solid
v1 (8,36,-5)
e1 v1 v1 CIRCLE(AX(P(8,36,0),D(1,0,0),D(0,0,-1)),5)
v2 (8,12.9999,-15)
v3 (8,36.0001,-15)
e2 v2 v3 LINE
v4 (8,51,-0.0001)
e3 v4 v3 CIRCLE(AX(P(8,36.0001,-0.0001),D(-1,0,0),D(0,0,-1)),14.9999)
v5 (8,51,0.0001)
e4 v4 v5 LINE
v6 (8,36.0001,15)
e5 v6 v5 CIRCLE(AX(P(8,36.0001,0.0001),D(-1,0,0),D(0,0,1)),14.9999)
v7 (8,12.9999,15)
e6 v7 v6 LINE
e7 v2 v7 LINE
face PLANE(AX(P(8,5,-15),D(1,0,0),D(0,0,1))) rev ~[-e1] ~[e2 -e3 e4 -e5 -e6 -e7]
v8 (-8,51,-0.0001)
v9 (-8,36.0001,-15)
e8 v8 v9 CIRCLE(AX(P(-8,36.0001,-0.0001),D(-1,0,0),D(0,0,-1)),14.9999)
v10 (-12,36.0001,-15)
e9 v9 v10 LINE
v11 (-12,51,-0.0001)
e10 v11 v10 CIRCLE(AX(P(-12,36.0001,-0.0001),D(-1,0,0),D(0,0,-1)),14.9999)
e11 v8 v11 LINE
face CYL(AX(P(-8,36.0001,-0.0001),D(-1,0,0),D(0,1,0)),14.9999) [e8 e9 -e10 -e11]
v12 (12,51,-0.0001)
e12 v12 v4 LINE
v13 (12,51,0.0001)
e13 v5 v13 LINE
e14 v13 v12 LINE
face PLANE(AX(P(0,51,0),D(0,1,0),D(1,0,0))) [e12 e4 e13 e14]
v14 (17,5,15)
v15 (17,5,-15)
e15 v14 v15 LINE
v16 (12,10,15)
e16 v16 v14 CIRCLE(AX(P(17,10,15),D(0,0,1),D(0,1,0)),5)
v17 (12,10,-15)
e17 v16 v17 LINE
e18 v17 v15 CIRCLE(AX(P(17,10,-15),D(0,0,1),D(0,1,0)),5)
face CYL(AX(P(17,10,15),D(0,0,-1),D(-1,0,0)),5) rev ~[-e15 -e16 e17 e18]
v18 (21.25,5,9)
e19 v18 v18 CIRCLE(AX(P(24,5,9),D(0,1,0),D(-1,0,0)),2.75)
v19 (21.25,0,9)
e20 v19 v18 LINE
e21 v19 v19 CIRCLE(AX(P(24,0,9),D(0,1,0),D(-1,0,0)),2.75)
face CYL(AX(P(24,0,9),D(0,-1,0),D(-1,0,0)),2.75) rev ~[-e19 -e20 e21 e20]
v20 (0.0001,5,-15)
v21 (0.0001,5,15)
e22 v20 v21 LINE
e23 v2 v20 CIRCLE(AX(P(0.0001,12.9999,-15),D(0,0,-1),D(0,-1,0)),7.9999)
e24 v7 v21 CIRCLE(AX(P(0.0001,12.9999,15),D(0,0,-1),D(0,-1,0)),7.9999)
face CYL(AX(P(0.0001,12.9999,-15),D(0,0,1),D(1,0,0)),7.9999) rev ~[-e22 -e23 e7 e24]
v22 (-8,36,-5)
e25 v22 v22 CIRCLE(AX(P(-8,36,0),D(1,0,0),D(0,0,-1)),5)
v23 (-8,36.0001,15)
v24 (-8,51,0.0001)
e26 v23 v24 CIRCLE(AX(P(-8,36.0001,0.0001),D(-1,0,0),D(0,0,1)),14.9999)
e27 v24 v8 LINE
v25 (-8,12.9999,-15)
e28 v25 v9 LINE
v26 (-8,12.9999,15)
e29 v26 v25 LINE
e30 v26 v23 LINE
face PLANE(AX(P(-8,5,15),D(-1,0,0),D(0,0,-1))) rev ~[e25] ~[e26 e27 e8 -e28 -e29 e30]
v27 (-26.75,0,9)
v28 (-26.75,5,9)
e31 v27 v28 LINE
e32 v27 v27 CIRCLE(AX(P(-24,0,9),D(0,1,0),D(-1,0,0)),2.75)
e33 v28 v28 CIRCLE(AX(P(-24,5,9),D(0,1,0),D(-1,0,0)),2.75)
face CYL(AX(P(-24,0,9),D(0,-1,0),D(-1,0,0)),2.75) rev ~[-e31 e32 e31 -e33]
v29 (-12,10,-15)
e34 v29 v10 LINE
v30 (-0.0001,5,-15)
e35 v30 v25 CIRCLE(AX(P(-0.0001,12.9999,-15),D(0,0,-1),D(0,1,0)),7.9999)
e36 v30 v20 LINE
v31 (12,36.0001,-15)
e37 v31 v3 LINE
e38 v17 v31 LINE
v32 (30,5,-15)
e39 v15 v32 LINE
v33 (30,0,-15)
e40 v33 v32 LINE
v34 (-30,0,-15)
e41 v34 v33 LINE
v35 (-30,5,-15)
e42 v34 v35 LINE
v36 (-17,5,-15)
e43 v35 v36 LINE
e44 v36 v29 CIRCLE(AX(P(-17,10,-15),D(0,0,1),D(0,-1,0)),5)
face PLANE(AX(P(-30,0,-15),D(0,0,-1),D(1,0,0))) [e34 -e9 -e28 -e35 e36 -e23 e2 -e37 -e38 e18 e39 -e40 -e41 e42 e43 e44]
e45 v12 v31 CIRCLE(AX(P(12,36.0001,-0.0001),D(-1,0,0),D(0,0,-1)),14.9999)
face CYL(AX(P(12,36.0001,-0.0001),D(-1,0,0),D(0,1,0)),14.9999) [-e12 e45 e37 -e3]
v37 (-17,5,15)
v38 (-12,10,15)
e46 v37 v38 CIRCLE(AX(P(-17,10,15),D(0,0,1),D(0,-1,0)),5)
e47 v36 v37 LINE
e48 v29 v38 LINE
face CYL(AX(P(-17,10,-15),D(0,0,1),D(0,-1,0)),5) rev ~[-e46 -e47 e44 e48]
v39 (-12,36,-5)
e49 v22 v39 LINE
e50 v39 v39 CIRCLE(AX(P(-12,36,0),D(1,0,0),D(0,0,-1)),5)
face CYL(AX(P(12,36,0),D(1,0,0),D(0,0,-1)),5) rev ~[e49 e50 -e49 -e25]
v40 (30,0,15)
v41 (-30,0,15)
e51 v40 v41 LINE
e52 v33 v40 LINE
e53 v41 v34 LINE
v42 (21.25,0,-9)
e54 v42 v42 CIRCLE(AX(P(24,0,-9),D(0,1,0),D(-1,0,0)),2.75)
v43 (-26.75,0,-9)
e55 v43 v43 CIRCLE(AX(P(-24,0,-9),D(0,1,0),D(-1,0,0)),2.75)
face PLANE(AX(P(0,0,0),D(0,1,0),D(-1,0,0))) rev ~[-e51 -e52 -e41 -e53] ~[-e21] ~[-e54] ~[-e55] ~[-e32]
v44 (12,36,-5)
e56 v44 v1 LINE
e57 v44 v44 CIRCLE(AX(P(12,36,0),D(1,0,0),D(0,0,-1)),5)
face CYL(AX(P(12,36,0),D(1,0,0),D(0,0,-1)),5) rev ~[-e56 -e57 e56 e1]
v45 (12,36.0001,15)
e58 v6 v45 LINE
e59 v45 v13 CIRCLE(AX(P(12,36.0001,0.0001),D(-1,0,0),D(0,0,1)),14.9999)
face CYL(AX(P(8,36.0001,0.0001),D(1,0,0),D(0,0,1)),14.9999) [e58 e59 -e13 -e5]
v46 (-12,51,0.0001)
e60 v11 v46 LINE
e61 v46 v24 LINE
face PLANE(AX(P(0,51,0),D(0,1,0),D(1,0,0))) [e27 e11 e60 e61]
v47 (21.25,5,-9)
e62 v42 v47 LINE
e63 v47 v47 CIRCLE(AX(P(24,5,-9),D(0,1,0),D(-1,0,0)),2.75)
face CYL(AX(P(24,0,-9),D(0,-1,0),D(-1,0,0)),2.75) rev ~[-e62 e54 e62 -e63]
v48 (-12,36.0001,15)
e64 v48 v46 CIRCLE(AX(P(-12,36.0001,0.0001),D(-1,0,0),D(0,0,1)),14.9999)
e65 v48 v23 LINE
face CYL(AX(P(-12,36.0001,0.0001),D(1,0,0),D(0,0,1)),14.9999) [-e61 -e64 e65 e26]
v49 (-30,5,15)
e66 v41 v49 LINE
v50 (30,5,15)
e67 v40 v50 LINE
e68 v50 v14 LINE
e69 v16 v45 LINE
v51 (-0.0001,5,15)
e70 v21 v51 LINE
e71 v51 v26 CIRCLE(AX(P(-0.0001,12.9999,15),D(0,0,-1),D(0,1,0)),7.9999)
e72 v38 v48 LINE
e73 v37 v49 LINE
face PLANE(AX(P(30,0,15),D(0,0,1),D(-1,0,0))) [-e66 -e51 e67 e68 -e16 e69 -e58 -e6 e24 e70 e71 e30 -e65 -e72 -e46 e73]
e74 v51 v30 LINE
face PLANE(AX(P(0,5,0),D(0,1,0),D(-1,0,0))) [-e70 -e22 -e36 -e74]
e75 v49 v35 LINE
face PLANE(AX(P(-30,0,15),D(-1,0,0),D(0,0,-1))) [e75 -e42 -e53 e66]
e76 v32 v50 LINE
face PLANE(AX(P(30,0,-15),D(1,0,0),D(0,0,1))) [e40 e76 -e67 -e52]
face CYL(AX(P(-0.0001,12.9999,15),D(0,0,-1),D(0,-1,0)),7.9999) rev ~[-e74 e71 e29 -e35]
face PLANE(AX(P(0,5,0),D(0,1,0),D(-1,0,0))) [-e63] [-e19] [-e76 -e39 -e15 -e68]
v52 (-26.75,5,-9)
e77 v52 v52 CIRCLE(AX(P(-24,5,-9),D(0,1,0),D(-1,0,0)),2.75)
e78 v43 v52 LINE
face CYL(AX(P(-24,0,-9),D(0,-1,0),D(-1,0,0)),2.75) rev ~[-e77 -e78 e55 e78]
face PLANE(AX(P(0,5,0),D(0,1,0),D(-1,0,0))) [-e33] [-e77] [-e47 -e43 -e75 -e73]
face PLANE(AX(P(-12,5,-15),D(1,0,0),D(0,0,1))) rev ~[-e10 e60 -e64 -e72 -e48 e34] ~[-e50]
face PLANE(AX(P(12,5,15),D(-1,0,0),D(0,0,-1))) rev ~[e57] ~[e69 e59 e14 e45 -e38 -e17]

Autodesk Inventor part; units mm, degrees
ref_plane "YZ Plane" through (0, 0, 0) normal (1, 0, 0) x (0, 1, 0)
ref_plane "XZ Plane" through (0, 0, 0) normal (0, 1, 0) x (-1, 0, 0)
ref_plane "XY Plane" through (0, 0, 0) normal (0, 0, 1) x (1, 0, 0)
sketch "Sketch1" plane through (0, 0, 0) normal (0, 1, 0) x (-1, 0, 0)
  line L0 (-30, 15) -> (30, 15)
  line L1 (30, 15) -> (30, -15)
  line L2 (30, -15) -> (-30, -15)
  line L3 (-30, -15) -> (-30, 15)
  line L4 (-30, 15) -> (30, -15) construction
  line L5 (30, 15) -> (-30, -15) construction
  circle A0 centre (24, -9) radius 2.75
  circle A1 centre (24, 9) radius 2.75
  circle A2 centre (-24, 9) radius 2.75
  circle A3 centre (-24, -9) radius 2.75
  point P0 (0, 0)
  dimension "d0" = 60
  dimension "d1" = 30
  dimension "d2" = 5.5
  dimension "d3" = 5.5
  dimension "d4" = 5.5
  dimension "d5" = 5.5
  dimension "d6" = 6
  dimension "d7" = 6
  dimension "d8" = 6
  dimension "d9" = 6
  dimension "d10" = 6
  dimension "d11" = 6
  dimension "d12" = 6
  dimension "d13" = 6
extrude "Extrusion1" add sketch "Sketch1" along normal blind 5
sketch "Sketch2" plane through (0, 5, 0) normal (0, 1, 0) x (1, 0, 0)
  line L0 (8, -15) -> (-8, -15)
  line L1 (-8, -15) -> (-8, 15)
  line L2 (-8, 15) -> (8, 15)
  line L3 (8, 15) -> (8, -15)
  line L4 (8, -15) -> (-8, 15) construction
  line L5 (-8, -15) -> (8, 15) construction
  line L6 (-8, 15) -> (-12, 15)
  line L7 (-12, 15) -> (-12, -15)
  line L8 (-12, -15) -> (-8, -15)
  line L9 (-8, -15) -> (-8, 15)
  line L10 (8, -15) -> (12, -15)
  line L11 (12, -15) -> (12, 15)
  line L12 (12, 15) -> (8, 15)
  line L13 (8, 15) -> (8, -15)
  point P0 (0, 0)
  dimension "d16" = 16
  dimension "d17" = 30
  dimension "d18" = 4
  dimension "d19" = 30
  dimension "d20" = 4
extrude "Extrusion2" add sketch "Sketch2" along normal blind 46 contours L3 L12 L11 L10 | L8 L7 L6 L1
sketch "Sketch3" plane through (12, 5, 15) normal (1, 0, 0) x (0, 0, -1)
  circle A0 centre (15, 31) radius 5
  line L0 (30, 0) -> (30, 46) projected
  line L1 (30, -5) -> (0, -5) projected
  point P0 (15, -5)
  dimension "d23" = 10
  dimension "d24" = 15
  dimension "d25" = 36
extrude "Extrusion3" cut sketch "Sketch3" against normal blind 40
fillet "Fillet1" radius 15 4 edges at (10, 51, 15) (10, 51, -15) (-10, 51, -15) (-10, 51, 15)
fillet "Fillet2" radius 5 2 edges at (12, 5, 0) (-12, 5, 0)
fillet "Fillet3" radius 8 2 edges at (-8, 5, 0) (8, 5, 0)
properties part number "Custom Pneumatic Support" material "Stainless Steel"
